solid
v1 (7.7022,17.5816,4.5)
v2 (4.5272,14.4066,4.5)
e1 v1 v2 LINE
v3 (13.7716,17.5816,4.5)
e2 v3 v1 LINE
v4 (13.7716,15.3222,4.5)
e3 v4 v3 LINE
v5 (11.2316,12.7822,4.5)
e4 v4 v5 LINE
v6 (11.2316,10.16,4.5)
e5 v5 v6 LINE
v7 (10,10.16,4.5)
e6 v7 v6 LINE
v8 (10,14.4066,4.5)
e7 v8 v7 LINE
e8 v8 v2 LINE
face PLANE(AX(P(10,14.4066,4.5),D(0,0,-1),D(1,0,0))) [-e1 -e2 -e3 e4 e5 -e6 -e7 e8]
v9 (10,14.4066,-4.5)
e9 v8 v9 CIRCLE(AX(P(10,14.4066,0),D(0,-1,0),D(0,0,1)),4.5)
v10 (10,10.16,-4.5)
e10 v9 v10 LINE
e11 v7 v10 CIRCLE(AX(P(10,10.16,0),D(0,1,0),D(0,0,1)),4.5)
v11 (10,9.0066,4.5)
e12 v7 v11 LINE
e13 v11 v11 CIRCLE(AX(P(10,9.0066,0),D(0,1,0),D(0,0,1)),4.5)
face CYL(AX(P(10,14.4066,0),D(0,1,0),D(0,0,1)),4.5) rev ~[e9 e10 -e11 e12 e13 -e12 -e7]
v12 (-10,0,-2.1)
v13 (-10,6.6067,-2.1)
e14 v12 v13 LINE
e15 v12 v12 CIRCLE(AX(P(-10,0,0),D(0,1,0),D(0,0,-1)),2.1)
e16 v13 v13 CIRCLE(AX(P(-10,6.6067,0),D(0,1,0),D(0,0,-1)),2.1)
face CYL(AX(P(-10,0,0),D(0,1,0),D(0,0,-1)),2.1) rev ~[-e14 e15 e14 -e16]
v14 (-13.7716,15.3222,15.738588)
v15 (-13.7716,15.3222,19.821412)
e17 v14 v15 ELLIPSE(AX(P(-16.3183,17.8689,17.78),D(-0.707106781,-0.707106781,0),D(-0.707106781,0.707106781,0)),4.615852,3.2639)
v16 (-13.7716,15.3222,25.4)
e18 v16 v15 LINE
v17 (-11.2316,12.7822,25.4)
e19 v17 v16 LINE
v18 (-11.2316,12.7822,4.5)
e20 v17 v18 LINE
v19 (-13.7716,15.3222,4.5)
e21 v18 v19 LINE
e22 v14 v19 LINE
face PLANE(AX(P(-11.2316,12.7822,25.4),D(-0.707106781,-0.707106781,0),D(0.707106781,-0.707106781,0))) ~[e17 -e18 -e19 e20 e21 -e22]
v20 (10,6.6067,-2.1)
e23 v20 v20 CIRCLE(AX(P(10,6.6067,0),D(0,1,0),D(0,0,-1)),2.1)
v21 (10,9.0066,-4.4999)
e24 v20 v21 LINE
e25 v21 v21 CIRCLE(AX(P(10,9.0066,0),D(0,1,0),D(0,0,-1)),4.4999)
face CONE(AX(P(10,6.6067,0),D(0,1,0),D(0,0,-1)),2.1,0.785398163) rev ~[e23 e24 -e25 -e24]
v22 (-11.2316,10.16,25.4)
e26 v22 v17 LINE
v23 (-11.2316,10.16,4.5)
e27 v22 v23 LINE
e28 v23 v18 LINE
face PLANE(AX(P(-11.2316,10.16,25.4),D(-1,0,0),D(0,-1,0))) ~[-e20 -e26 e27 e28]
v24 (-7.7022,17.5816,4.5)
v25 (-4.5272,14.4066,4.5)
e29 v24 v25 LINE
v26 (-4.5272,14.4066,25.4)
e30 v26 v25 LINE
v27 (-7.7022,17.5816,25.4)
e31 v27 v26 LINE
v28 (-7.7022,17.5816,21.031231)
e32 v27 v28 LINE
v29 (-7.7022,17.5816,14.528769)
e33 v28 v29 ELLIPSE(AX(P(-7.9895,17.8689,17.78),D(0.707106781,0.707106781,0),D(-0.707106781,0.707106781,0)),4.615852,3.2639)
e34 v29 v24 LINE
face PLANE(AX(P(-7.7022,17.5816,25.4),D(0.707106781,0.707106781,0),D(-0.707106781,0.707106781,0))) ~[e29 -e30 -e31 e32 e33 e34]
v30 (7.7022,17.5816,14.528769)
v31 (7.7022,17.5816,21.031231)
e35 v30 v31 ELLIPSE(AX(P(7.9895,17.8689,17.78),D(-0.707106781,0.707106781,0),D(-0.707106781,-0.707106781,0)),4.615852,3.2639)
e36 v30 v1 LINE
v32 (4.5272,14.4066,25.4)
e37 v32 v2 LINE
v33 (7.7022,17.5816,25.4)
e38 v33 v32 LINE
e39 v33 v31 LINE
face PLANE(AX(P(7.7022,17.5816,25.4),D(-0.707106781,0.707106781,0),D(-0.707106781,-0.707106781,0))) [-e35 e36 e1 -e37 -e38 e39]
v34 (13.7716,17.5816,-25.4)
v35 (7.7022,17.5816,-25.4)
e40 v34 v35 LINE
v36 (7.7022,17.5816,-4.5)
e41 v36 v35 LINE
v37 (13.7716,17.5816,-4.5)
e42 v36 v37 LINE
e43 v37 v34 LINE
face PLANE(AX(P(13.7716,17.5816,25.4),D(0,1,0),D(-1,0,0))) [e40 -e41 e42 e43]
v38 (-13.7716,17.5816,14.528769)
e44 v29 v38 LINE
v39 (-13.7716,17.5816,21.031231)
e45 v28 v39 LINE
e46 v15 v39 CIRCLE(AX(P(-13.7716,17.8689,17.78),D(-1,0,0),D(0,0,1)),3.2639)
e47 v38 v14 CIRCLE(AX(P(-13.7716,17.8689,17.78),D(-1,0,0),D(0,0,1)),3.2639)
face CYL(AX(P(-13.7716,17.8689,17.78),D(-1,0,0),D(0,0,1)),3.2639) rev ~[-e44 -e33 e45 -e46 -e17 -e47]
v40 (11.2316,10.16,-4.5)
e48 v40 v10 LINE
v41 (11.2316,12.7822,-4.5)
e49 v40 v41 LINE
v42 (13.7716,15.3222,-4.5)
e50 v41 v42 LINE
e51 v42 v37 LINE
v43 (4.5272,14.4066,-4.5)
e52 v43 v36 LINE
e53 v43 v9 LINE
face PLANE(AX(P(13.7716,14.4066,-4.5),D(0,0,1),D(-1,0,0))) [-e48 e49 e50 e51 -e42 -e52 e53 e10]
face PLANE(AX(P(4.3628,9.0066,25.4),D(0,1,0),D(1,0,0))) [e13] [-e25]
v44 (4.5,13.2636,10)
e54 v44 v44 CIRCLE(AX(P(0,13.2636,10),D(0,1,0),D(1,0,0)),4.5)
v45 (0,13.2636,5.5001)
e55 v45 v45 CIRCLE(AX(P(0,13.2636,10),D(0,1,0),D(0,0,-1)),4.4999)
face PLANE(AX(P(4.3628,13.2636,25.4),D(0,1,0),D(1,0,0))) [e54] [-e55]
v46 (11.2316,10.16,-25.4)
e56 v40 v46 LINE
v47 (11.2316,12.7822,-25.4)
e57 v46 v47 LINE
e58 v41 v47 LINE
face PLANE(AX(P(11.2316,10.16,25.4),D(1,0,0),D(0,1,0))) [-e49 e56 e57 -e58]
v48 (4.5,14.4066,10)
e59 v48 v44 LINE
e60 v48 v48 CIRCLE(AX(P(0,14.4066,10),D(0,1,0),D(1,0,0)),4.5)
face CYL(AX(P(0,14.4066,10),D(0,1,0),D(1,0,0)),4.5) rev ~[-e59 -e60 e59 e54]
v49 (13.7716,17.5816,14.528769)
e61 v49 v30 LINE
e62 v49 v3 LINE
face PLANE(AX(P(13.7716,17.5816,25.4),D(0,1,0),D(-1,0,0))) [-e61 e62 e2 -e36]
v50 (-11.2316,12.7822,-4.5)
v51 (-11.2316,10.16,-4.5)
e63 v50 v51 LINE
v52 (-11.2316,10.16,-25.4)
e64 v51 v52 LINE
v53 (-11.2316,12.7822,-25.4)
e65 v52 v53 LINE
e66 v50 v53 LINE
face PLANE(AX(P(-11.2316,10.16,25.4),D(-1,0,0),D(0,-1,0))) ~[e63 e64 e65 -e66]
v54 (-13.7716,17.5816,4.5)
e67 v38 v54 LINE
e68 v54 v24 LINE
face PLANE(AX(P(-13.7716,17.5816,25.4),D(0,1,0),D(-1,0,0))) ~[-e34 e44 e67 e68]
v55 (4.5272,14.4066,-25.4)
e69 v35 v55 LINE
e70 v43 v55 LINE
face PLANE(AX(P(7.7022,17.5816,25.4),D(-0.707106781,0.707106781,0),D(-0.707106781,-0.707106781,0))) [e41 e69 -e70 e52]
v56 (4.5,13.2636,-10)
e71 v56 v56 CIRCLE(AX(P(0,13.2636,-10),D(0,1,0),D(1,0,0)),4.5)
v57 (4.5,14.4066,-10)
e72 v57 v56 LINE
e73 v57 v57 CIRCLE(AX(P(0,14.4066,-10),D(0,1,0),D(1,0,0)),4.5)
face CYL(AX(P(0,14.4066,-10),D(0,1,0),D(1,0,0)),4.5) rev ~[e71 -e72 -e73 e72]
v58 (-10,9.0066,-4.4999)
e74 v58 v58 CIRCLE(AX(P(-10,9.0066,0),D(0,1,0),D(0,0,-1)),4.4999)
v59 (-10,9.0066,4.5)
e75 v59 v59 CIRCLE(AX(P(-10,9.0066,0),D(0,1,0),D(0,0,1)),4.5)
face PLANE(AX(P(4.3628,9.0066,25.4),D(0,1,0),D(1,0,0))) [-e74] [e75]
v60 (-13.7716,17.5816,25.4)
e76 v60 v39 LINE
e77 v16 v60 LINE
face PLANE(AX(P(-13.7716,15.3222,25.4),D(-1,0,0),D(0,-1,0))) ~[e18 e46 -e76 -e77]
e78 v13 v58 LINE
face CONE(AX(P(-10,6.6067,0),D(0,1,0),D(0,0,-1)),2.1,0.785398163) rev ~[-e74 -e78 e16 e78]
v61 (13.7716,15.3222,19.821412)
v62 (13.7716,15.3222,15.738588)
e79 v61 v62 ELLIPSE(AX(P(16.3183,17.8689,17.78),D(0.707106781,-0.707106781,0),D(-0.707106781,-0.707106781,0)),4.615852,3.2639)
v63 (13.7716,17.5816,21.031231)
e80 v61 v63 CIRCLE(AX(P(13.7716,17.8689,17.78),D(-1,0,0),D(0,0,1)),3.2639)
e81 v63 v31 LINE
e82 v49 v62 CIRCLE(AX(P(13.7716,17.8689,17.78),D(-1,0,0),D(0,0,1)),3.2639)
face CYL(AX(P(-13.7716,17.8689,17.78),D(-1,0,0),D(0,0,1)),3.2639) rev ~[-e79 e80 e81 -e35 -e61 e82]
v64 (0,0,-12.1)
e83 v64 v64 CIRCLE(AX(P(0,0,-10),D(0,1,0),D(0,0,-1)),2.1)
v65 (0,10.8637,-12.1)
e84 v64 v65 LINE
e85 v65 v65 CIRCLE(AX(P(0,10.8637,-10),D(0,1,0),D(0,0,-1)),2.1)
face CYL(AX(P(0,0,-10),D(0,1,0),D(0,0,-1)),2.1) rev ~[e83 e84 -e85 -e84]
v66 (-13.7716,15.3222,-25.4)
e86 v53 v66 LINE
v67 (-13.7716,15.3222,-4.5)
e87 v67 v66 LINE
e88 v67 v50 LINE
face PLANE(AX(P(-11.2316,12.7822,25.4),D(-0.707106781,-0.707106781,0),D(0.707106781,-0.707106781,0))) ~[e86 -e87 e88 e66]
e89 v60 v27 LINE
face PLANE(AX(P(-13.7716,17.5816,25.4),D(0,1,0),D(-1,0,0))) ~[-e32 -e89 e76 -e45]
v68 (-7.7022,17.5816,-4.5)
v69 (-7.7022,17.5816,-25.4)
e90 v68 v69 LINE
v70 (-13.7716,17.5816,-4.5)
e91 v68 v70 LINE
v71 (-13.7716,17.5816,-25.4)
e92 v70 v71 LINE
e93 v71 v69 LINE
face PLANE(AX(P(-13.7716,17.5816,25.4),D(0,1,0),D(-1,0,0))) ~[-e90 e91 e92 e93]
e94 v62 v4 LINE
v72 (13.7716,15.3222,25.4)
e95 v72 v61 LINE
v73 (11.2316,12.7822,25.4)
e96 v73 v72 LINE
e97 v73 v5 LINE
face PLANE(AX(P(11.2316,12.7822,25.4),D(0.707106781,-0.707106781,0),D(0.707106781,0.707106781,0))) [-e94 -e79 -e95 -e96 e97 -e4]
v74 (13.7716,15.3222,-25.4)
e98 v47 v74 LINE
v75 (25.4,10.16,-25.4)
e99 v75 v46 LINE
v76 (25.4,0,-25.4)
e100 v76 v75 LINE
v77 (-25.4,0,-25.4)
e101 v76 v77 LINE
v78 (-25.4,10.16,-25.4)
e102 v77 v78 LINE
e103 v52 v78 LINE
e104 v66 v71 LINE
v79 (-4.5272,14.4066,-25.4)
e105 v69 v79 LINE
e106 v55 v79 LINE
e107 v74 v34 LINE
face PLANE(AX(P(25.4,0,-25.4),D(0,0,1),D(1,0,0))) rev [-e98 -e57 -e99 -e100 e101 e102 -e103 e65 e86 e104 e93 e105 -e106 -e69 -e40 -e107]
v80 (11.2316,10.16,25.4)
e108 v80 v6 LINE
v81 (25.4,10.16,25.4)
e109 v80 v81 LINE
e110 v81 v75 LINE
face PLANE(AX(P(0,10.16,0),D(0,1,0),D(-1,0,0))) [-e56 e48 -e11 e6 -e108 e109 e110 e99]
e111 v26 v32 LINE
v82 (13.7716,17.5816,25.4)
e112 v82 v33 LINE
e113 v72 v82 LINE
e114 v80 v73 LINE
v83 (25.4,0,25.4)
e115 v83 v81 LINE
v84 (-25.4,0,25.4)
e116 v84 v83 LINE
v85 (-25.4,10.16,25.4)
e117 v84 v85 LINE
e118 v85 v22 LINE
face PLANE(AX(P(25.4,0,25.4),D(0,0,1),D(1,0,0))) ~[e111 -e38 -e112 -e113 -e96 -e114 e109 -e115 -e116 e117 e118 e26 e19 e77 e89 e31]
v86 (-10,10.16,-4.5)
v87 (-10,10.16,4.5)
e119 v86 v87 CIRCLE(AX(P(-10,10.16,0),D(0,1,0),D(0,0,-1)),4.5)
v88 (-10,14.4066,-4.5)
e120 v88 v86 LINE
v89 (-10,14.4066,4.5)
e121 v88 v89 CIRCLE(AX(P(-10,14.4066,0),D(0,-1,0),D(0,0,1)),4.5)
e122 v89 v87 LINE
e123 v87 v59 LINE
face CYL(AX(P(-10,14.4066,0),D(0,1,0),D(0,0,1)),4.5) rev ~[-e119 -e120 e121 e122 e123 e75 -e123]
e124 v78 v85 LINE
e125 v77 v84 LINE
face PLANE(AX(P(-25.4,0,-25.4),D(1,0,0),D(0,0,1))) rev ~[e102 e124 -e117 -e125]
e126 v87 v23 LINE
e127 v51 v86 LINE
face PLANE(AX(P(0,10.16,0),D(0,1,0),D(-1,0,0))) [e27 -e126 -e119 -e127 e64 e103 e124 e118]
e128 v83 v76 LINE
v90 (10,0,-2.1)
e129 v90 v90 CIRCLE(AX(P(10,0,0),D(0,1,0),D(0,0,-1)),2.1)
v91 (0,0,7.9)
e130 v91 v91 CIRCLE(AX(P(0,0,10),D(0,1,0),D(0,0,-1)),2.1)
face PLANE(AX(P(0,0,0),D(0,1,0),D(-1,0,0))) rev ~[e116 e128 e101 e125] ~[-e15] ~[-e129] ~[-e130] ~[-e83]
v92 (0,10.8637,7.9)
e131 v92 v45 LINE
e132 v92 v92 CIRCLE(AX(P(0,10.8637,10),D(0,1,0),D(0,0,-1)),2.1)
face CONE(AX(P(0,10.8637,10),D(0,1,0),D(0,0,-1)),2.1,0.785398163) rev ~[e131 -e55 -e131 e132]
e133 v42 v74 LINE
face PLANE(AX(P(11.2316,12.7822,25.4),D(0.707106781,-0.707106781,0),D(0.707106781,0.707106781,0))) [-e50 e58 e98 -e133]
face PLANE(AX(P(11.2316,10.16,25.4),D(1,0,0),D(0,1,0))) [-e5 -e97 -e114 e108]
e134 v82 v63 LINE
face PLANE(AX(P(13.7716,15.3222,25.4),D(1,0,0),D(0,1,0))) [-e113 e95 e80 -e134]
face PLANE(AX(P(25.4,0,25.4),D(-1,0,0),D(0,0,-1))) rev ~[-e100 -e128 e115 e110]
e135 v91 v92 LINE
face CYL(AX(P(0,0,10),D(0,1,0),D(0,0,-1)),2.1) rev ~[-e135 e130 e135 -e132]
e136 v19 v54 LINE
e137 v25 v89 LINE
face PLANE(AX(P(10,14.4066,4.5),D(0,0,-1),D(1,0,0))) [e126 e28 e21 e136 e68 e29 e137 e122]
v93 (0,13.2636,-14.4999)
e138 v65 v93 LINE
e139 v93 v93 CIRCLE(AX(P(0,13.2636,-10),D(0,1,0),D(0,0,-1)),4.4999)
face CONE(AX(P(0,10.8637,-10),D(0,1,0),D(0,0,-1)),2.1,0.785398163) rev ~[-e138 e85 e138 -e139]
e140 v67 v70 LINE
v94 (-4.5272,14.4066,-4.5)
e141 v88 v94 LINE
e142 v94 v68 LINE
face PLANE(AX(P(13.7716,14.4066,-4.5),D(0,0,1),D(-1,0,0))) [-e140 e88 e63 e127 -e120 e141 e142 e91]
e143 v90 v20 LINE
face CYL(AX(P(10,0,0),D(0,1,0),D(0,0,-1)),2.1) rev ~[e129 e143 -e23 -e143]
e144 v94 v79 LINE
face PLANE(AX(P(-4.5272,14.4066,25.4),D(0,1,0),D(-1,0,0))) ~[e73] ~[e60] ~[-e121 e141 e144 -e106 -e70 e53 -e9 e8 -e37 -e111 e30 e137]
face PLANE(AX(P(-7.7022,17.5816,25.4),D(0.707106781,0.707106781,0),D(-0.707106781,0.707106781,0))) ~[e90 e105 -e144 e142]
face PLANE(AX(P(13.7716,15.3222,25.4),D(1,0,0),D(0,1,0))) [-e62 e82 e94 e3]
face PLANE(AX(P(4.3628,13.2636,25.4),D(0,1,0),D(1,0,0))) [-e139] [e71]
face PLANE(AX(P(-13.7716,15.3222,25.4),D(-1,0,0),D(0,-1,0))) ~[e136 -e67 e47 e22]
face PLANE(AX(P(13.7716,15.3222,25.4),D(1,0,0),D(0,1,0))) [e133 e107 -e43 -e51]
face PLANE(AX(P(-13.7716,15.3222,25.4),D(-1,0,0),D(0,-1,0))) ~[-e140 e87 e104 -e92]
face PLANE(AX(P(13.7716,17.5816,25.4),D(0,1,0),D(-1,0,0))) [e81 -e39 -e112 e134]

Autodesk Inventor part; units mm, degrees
ref_plane "YZ Plane" through (0, 0, 0) normal (1, 0, 0) x (0, 1, 0)
ref_plane "XZ Plane" through (0, 0, 0) normal (0, 1, 0) x (-1, 0, 0)
ref_plane "XY Plane" through (0, 0, 0) normal (0, 0, 1) x (1, 0, 0)
sketch "Sketch1" plane through (0, 0, 0) normal (0, 1, 0) x (-1, 0, 0)
  line L0 (25.4, 25.4) -> (-25.4, 25.4)
  line L1 (-25.4, 25.4) -> (-25.4, -25.4)
  line L2 (-25.4, -25.4) -> (25.4, -25.4)
  line L3 (25.4, -25.4) -> (25.4, 25.4)
  line L4 (25.4, 25.4) -> (-25.4, -25.4) construction
  line L5 (-25.4, 25.4) -> (25.4, -25.4) construction
  point P0 (0, 0)
  dimension "d0" = 50.8
  dimension "d1" = 50.8
extrude "Extrusion1" add sketch "Sketch1" along normal blind 10.16
sketch "Sketch2" plane through (-25.4, 0, 25.4) normal (0, 0, 1) x (1, 0, 0)
  line L0 (0, 10.16) -> (50.8, 10.16) projected
  line L1 (36.83, 10.16) -> (36.83, 12.7) construction
  line L2 (36.83, 12.7) -> (39.37, 15.24) construction
  line L3 (39.37, 15.24) -> (39.37, 17.78) construction
  line L4 (39.37, 17.78) -> (33.02, 17.78) construction
  line L5 (33.02, 17.78) -> (29.845, 14.605) construction
  line L6 (29.845, 14.605) -> (25.4, 14.605) construction
  line L7 (25.4, 14.605) -> (25.4, 10.16) construction
  line L8 (25.4, 10.16) -> (36.83, 10.16) construction
  line L9 (36.6316, 10.16) -> (36.6316, 12.7822)
  line L10 (36.6316, 12.7822) -> (39.1716, 15.3222)
  line L11 (39.1716, 15.3222) -> (39.1716, 17.5816)
  line L12 (39.1716, 17.5816) -> (33.1022, 17.5816)
  line L13 (33.1022, 17.5816) -> (29.9272, 14.4066)
  line L14 (29.9272, 14.4066) -> (25.4, 14.4066)
  line L15 (25.4, 10.16) -> (25.4, 14.4066)
  line L16 (25.4, 10.16) -> (36.6316, 10.16)
  point P0 (25.4, 0)
  dimension "d4" = 2.54
  dimension "d5" = 2.54
  dimension "d6" = 135
  dimension "d7" = 3.175
  dimension "d8" = 6.35
  dimension "d9" = 13.97
  dimension "d10" = 11.43
  dimension "d26" = 0.1984
  dimension "d27" = 0.1984
  dimension "d28" = 0.1984
  dimension "d29" = 0.1984
  dimension "d30" = 0.1984
  dimension "d31" = 0.1984
extrude "Extrusion2" add sketch "Sketch2" against normal up to surface (50.8 mm away)
mirror "Mirror1" about plane through (0, 10.16, 25.4) normal (-1, 0, 0) of "Extrusion2"
sketch "Sketch3" plane through (0, 0, 0) normal (0, -1, 0) x (1, 0, 0)
  line L0 (0, -10) -> (10, 0) construction
  line L1 (10, 0) -> (0, 10) construction
  line L2 (0, 10) -> (-10, 0) construction
  line L3 (-10, 0) -> (0, -10) construction
  line L4 (0, -10) -> (0, 10) construction
  line L5 (10, 0) -> (-10, 0) construction
  point P0 (0, 0)
  point P1 (-10, 0)
  dimension "d13" = 20
hole "Hole1" at (0, 0, 10) at (-10, 0, 0) at (0, 0, -10) at (10, 0, 0) direction (0, 1, 0) diameter 4.2 end through all
sketch "Sketch4" plane through (4.3628, 14.4066, 25.4) normal (0, 1, 0) x (1, 0, 0)
  arc A0 (5.6372, 29.9) -> (5.6372, 20.9) centre (5.6372, 25.4) ccw
  circle A1 centre (-4.3628, 15.4) radius 4.5
  arc A2 (-14.3628, 29.9) -> (-14.3628, 20.9) centre (-14.3628, 25.4) ccw
  circle A3 centre (-4.3628, 35.4) radius 4.5
  line L0 (-14.3628, 20.9) -> (-18.1344, 20.9)
  line L1 (-18.1344, 20.9) -> (-18.1344, 29.9)
  line L2 (-18.1344, 29.9) -> (-14.3628, 29.9)
  line L3 (5.6372, 20.9) -> (9.4088, 20.9)
  line L4 (9.4088, 20.9) -> (9.4088, 29.9)
  line L5 (9.4088, 29.9) -> (5.6372, 29.9)
  arc A4 (5.6372, 20.9) -> (5.6372, 29.9) centre (5.6372, 25.4) ccw
  arc A5 (-14.3628, 20.9) -> (-14.3628, 29.9) centre (-14.3628, 25.4) ccw
  line L6 (9.4088, 0) -> (9.4088, 50.8) projected
  line L7 (-18.1344, 0) -> (-18.1344, 50.8) projected
  circle A6 centre (-4.3628, 15.4) radius 2.1 construction
  circle A7 centre (5.6372, 25.4) radius 2.1 construction
  circle A8 centre (-4.3628, 35.4) radius 2.1 construction
  circle A9 centre (-14.3628, 25.4) radius 2.1 construction
  line L8 (5.6372, 20.9) -> (-14.3628, 20.9)
  line L9 (-14.3628, 29.9) -> (5.6372, 29.9)
  dimension "d21" = 9
extrude "Extrusion3" cut sketch "Sketch4" along normal blind 10.16 contours A4 L4 A0 | L5 L4 A4 | A0 L8 A5 L9 | A4 L4 L3 | A5 A2 L1 | A2 L1 L2 | L0 L1 A2 | A1 | A3
extrude "Extrusion4" cut sketch "Sketch4" against normal blind 5.4 contours A4 L4 A0 | A4 L4 | A5 A2 L1 | L1 A2
extrude "Extrusion5" cut sketch "Sketch4" against normal up to surface (4.2466 mm away) contours A4 L4 A0 | L5 L4 A4 | A4 L4 L3 | A5 A2 L1 | A2 L1 L2 | L0 L1 A2
chamfer "Chamfer1" distance 2.4 angle 45 2 edges at (10, 9.0066, 2.1) (-10, 9.0066, 2.1)
extrude "Extrusion6" cut sketch "Sketch4" against normal blind 1.143 contours A1 | A3
chamfer "Chamfer2" distance 2.4 angle 45 2 edges at (0, 13.2636, 12.1) (0, 13.2636, -7.9)
sketch "Sketch5" plane through (-13.7716, 15.3222, 25.4) normal (-1, 0, 0) x (0, 0, 1)
  circle A0 centre (-7.62, 2.5446) radius 3.2639 construction
  line L0 (-10.8839, 2.5446) -> (-10.8839, 2.2594) construction
  line L1 (-10.8839, 2.2594) -> (-4.3686, 2.2594) construction
  line L2 (-10.8839, 2.2594) -> (-10.8839, 2.5446) construction
  line L3 (0, 2.2594) -> (-20.9, 2.2594) construction
  line L4 (0, 2.2594) -> (-20.9, 2.2594) construction
  line L5 (0, 2.2594) -> (-20.9, 2.2594) construction
  arc A1 (-10.8839, 2.5446) -> (-10.8714, 2.2594) centre (-7.62, 2.5446) ccw construction
  arc A2 (-4.3686, 2.2594) -> (-10.8839, 2.5446) centre (-7.62, 2.5446) ccw construction
  line L6 (-4.3686, 2.2594) -> (-10.8714, 2.2594) construction
  line L7 (-10.8714, 2.2594) -> (-10.8839, 2.2594) construction
  circle A3 centre (-7.62, 2.5467) radius 3.2639 projected
  point P0 (-25.4, -15.3222)
  dimension "d44" = 7.62
  dimension "d45" = 6.5278
extrude "Extrusion7" cut sketch "Sketch5" against normal through all
equation "\"d27\" = d26"
equation "\"d28\" = d26"
equation "\"d29\" = d26"
equation "\"d30\" = d26"
equation "\"d31\" = d26"
properties part number "Gantry_Mount_Rail" material "ABS Plastic"
